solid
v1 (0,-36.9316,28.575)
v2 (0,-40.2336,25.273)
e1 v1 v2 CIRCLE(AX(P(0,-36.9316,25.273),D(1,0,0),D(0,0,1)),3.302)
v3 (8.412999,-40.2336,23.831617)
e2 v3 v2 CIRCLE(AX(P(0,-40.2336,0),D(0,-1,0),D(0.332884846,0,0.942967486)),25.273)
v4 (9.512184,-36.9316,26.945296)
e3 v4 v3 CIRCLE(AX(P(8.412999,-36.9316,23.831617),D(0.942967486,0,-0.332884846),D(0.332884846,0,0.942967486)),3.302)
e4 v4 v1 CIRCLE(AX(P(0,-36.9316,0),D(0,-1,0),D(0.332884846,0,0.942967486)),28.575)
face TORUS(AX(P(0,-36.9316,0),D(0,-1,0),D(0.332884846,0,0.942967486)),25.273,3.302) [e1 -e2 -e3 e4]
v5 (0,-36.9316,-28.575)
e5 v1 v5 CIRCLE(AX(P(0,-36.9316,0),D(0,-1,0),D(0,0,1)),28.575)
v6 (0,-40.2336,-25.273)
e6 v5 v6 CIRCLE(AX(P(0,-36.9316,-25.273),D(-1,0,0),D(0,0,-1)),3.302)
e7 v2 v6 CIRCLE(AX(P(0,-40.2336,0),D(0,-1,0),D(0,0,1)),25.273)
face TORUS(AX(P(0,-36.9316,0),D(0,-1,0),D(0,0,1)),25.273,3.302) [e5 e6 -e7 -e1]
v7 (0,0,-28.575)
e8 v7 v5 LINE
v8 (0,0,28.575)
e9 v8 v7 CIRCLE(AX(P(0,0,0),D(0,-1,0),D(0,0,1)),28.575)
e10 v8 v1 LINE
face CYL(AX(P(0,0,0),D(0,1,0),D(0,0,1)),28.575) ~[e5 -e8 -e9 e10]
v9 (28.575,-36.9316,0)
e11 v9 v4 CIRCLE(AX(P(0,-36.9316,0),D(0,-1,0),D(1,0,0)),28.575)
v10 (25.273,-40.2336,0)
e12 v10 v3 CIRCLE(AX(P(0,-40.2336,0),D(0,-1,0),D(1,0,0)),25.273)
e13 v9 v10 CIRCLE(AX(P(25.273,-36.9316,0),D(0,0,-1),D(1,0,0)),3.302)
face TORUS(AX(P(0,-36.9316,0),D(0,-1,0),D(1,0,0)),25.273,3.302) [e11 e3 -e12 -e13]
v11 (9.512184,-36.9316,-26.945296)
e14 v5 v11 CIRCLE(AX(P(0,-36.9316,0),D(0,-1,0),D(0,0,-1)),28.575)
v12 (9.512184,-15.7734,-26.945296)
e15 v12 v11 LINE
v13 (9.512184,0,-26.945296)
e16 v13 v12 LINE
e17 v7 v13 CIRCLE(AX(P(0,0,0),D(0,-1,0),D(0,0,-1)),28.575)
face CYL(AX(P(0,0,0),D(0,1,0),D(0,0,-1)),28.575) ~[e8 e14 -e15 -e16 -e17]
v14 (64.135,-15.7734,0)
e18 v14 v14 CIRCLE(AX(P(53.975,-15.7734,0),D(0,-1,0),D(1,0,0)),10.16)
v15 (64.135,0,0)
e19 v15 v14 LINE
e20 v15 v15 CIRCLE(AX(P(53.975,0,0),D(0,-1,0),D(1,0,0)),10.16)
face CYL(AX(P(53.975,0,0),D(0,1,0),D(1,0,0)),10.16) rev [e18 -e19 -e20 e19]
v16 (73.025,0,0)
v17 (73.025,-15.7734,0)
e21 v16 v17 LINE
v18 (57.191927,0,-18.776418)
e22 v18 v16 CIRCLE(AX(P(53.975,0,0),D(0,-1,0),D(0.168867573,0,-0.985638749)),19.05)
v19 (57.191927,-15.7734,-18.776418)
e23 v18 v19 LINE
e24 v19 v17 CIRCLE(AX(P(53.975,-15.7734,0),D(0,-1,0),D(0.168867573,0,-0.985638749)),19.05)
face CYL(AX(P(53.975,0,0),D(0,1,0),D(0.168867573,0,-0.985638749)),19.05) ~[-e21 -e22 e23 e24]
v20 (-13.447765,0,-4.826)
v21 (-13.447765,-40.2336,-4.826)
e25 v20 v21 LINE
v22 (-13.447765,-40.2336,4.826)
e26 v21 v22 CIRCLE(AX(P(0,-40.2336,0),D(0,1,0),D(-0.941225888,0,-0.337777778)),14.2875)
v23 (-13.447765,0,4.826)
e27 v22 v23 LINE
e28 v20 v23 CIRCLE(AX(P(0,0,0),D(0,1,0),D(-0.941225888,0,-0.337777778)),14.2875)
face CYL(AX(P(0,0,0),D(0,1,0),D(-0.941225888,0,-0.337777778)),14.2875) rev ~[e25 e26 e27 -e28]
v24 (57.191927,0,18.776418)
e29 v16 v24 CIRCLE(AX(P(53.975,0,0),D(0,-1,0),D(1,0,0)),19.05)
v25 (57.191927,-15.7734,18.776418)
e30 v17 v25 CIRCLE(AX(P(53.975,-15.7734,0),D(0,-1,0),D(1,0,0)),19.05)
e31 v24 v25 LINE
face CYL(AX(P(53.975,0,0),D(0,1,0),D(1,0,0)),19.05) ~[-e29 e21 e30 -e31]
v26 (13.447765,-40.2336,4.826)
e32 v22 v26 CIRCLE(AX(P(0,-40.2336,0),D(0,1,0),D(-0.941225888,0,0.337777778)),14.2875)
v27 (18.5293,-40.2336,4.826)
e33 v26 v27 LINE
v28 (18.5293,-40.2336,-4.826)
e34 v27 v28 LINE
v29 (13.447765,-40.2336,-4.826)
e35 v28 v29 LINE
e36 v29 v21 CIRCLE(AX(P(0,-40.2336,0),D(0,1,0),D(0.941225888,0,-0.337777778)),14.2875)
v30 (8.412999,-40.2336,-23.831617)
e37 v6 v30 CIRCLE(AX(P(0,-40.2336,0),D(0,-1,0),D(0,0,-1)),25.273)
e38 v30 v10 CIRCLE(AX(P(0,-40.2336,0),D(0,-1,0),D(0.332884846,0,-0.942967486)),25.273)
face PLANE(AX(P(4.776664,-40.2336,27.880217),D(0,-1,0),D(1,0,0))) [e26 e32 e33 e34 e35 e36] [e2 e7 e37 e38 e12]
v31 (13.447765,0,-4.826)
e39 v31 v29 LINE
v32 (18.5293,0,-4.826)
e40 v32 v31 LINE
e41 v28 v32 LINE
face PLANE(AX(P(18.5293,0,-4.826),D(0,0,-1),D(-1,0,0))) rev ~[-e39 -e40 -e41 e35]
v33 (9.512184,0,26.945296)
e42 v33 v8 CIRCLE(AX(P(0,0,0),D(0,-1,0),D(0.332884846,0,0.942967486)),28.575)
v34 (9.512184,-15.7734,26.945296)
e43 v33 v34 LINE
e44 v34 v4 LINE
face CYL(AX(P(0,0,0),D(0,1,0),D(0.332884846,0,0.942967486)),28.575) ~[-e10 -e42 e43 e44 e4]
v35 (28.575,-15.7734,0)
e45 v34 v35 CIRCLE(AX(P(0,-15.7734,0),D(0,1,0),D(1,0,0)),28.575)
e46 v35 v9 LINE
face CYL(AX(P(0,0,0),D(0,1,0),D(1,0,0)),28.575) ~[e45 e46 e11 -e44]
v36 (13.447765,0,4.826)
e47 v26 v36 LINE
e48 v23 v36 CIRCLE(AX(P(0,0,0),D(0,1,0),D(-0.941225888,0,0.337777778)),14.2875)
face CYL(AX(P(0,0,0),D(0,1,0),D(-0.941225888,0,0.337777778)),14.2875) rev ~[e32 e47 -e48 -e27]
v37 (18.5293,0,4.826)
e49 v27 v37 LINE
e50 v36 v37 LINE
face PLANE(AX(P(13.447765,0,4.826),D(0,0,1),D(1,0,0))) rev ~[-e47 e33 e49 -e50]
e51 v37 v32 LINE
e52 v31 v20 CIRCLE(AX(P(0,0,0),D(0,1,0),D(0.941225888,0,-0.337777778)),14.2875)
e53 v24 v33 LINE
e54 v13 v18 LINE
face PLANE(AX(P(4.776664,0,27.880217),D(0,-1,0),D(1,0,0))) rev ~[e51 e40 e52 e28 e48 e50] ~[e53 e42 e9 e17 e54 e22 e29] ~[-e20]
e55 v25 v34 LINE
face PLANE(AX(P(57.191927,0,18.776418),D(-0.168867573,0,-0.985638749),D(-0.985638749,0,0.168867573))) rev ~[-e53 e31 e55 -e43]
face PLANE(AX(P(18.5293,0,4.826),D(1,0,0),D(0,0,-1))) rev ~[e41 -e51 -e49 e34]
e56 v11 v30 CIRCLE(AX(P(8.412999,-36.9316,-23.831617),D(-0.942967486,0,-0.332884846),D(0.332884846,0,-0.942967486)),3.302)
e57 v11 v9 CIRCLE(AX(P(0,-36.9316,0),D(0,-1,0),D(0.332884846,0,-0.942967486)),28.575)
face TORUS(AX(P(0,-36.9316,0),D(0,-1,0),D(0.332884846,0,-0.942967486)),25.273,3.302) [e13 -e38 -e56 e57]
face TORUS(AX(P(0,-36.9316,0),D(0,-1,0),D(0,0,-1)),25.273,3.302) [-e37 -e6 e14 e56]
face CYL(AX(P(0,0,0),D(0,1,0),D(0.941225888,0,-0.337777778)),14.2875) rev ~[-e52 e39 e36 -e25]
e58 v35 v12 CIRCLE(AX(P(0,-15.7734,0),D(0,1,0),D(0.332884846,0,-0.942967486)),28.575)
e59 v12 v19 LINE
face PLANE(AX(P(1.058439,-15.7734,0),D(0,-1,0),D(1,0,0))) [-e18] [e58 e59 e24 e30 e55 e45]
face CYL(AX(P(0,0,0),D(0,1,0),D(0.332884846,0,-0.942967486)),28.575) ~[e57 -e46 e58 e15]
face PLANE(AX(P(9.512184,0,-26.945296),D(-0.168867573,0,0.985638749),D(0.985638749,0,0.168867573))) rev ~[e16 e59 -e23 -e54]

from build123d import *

# Parameters (mm, degrees)
F1_DEPTH = 40.2336
F0_R     = 10.16
F2_DEPTH = 15.7734
F3_R     = 3.302


with BuildPart() as f1:
    # F0 (on Front) → F1 (new body)
    with BuildSketch(Plane.XZ):
        with BuildLine():
            ThreePointArc((9.5121844836, 26.9452959039), (4.8253908933, 28.1646272428), (0, 28.575))
            Line((0, 28.575), (9.5121844836, 26.9452959039))
        make_face()
        with BuildLine():
            Line((9.5121844836, -26.9452959039), (0, -28.575))
            ThreePointArc((0, -28.575), (4.8253908933, -28.1646272428), (9.5121844836, -26.9452959039))
        make_face()
        with BuildLine():
            Line((9.5121844836, 26.9452959039), (0, 28.575))
            ThreePointArc((0, 28.575), (-28.575, 0), (0, -28.575))
            Line((0, -28.575), (9.5121844836, -26.9452959039))
            ThreePointArc((9.5121844836, -26.9452959039), (23.3274655355, -16.5033322905), (28.575, 0))
            ThreePointArc((28.575, 0), (23.3274655355, 16.5033322905), (9.5121844836, 26.9452959039))
        make_face()
        with BuildLine():
            ThreePointArc((-13.4477648793, 4.826), (0, 14.2875), (13.4477648793, 4.826))
            Line((13.4477648793, 4.826), (18.5293, 4.826))
            Line((18.5293, 4.826), (18.5293, -4.826))
            Line((18.5293, -4.826), (13.4477648793, -4.826))
            ThreePointArc((13.4477648793, -4.826), (0, -14.2875), (-13.4477648793, -4.826))
            Line((-13.4477648793, -4.826), (-18.5293, -4.826))
            Line((-18.5293, -4.826), (-18.5293, 4.826))
            Line((-18.5293, 4.826), (-13.4477648793, 4.826))
        make_face(mode=Mode.SUBTRACT)
        with BuildLine():
            ThreePointArc((-13.4477648793, -4.826), (-14.2875, 0), (-13.4477648793, 4.826))
            Line((-13.4477648793, 4.826), (-18.5293, 4.826))
            Line((-18.5293, 4.826), (-18.5293, -4.826))
            Line((-18.5293, -4.826), (-13.4477648793, -4.826))
        make_face()
    extrude(amount=F1_DEPTH)

    # F0 (on Front) → F2 (join)
    with BuildSketch(Plane.XZ):
        with BuildLine():
            Line((9.5121844836, 26.9452959039), (0, 28.575))
            ThreePointArc((0, 28.575), (-28.575, 0), (0, -28.575))
            Line((0, -28.575), (9.5121844836, -26.9452959039))
            ThreePointArc((9.5121844836, -26.9452959039), (23.3274655355, -16.5033322905), (28.575, 0))
            ThreePointArc((28.575, 0), (23.3274655355, 16.5033322905), (9.5121844836, 26.9452959039))
        make_face()
        with BuildLine():
            ThreePointArc((-13.4477648793, 4.826), (0, 14.2875), (13.4477648793, 4.826))
            Line((13.4477648793, 4.826), (18.5293, 4.826))
            Line((18.5293, 4.826), (18.5293, -4.826))
            Line((18.5293, -4.826), (13.4477648793, -4.826))
            ThreePointArc((13.4477648793, -4.826), (0, -14.2875), (-13.4477648793, -4.826))
            Line((-13.4477648793, -4.826), (-18.5293, -4.826))
            Line((-18.5293, -4.826), (-18.5293, 4.826))
            Line((-18.5293, 4.826), (-13.4477648793, 4.826))
        make_face(mode=Mode.SUBTRACT)
        with BuildLine():
            ThreePointArc((9.5121844836, 26.9452959039), (4.8253908933, 28.1646272428), (0, 28.575))
            Line((0, 28.575), (9.5121844836, 26.9452959039))
        make_face()
        with BuildLine():
            Line((9.5121844836, -26.9452959039), (0, -28.575))
            ThreePointArc((0, -28.575), (4.8253908933, -28.1646272428), (9.5121844836, -26.9452959039))
        make_face()
        with BuildLine():
            Line((57.1919272622, 18.7764181619), (9.5121844836, 26.9452959039))
            ThreePointArc((9.5121844836, 26.9452959039), (23.3274655355, 16.5033322905), (28.575, 0))
            ThreePointArc((28.575, 0), (23.3274655355, -16.5033322905), (9.5121844836, -26.9452959039))
            Line((9.5121844836, -26.9452959039), (57.1919272622, -18.7764181619))
            ThreePointArc((57.1919272622, -18.7764181619), (34.925, 0), (57.1919272622, 18.7764181619))
        make_face()
        with BuildLine():
            ThreePointArc((73.025, 0), (68.5383952831, 12.2804730295), (57.1919272622, 18.7764181619))
            ThreePointArc((57.1919272622, 18.7764181619), (34.925, 0), (57.1919272622, -18.7764181619))
            ThreePointArc((57.1919272622, -18.7764181619), (68.5383952831, -12.2804730295), (73.025, 0))
        make_face()
        with Locations((53.975, 0)):
            Circle(F0_R, mode=Mode.SUBTRACT)
    extrude(amount=F2_DEPTH)

    # F3
    f3_edges = [f1.edges().sort_by_distance(p)[0] for p in [
        (0, -40.2336, -28.575),
    ]]
    fillet(f3_edges, radius=F3_R)


solid = f1.part
